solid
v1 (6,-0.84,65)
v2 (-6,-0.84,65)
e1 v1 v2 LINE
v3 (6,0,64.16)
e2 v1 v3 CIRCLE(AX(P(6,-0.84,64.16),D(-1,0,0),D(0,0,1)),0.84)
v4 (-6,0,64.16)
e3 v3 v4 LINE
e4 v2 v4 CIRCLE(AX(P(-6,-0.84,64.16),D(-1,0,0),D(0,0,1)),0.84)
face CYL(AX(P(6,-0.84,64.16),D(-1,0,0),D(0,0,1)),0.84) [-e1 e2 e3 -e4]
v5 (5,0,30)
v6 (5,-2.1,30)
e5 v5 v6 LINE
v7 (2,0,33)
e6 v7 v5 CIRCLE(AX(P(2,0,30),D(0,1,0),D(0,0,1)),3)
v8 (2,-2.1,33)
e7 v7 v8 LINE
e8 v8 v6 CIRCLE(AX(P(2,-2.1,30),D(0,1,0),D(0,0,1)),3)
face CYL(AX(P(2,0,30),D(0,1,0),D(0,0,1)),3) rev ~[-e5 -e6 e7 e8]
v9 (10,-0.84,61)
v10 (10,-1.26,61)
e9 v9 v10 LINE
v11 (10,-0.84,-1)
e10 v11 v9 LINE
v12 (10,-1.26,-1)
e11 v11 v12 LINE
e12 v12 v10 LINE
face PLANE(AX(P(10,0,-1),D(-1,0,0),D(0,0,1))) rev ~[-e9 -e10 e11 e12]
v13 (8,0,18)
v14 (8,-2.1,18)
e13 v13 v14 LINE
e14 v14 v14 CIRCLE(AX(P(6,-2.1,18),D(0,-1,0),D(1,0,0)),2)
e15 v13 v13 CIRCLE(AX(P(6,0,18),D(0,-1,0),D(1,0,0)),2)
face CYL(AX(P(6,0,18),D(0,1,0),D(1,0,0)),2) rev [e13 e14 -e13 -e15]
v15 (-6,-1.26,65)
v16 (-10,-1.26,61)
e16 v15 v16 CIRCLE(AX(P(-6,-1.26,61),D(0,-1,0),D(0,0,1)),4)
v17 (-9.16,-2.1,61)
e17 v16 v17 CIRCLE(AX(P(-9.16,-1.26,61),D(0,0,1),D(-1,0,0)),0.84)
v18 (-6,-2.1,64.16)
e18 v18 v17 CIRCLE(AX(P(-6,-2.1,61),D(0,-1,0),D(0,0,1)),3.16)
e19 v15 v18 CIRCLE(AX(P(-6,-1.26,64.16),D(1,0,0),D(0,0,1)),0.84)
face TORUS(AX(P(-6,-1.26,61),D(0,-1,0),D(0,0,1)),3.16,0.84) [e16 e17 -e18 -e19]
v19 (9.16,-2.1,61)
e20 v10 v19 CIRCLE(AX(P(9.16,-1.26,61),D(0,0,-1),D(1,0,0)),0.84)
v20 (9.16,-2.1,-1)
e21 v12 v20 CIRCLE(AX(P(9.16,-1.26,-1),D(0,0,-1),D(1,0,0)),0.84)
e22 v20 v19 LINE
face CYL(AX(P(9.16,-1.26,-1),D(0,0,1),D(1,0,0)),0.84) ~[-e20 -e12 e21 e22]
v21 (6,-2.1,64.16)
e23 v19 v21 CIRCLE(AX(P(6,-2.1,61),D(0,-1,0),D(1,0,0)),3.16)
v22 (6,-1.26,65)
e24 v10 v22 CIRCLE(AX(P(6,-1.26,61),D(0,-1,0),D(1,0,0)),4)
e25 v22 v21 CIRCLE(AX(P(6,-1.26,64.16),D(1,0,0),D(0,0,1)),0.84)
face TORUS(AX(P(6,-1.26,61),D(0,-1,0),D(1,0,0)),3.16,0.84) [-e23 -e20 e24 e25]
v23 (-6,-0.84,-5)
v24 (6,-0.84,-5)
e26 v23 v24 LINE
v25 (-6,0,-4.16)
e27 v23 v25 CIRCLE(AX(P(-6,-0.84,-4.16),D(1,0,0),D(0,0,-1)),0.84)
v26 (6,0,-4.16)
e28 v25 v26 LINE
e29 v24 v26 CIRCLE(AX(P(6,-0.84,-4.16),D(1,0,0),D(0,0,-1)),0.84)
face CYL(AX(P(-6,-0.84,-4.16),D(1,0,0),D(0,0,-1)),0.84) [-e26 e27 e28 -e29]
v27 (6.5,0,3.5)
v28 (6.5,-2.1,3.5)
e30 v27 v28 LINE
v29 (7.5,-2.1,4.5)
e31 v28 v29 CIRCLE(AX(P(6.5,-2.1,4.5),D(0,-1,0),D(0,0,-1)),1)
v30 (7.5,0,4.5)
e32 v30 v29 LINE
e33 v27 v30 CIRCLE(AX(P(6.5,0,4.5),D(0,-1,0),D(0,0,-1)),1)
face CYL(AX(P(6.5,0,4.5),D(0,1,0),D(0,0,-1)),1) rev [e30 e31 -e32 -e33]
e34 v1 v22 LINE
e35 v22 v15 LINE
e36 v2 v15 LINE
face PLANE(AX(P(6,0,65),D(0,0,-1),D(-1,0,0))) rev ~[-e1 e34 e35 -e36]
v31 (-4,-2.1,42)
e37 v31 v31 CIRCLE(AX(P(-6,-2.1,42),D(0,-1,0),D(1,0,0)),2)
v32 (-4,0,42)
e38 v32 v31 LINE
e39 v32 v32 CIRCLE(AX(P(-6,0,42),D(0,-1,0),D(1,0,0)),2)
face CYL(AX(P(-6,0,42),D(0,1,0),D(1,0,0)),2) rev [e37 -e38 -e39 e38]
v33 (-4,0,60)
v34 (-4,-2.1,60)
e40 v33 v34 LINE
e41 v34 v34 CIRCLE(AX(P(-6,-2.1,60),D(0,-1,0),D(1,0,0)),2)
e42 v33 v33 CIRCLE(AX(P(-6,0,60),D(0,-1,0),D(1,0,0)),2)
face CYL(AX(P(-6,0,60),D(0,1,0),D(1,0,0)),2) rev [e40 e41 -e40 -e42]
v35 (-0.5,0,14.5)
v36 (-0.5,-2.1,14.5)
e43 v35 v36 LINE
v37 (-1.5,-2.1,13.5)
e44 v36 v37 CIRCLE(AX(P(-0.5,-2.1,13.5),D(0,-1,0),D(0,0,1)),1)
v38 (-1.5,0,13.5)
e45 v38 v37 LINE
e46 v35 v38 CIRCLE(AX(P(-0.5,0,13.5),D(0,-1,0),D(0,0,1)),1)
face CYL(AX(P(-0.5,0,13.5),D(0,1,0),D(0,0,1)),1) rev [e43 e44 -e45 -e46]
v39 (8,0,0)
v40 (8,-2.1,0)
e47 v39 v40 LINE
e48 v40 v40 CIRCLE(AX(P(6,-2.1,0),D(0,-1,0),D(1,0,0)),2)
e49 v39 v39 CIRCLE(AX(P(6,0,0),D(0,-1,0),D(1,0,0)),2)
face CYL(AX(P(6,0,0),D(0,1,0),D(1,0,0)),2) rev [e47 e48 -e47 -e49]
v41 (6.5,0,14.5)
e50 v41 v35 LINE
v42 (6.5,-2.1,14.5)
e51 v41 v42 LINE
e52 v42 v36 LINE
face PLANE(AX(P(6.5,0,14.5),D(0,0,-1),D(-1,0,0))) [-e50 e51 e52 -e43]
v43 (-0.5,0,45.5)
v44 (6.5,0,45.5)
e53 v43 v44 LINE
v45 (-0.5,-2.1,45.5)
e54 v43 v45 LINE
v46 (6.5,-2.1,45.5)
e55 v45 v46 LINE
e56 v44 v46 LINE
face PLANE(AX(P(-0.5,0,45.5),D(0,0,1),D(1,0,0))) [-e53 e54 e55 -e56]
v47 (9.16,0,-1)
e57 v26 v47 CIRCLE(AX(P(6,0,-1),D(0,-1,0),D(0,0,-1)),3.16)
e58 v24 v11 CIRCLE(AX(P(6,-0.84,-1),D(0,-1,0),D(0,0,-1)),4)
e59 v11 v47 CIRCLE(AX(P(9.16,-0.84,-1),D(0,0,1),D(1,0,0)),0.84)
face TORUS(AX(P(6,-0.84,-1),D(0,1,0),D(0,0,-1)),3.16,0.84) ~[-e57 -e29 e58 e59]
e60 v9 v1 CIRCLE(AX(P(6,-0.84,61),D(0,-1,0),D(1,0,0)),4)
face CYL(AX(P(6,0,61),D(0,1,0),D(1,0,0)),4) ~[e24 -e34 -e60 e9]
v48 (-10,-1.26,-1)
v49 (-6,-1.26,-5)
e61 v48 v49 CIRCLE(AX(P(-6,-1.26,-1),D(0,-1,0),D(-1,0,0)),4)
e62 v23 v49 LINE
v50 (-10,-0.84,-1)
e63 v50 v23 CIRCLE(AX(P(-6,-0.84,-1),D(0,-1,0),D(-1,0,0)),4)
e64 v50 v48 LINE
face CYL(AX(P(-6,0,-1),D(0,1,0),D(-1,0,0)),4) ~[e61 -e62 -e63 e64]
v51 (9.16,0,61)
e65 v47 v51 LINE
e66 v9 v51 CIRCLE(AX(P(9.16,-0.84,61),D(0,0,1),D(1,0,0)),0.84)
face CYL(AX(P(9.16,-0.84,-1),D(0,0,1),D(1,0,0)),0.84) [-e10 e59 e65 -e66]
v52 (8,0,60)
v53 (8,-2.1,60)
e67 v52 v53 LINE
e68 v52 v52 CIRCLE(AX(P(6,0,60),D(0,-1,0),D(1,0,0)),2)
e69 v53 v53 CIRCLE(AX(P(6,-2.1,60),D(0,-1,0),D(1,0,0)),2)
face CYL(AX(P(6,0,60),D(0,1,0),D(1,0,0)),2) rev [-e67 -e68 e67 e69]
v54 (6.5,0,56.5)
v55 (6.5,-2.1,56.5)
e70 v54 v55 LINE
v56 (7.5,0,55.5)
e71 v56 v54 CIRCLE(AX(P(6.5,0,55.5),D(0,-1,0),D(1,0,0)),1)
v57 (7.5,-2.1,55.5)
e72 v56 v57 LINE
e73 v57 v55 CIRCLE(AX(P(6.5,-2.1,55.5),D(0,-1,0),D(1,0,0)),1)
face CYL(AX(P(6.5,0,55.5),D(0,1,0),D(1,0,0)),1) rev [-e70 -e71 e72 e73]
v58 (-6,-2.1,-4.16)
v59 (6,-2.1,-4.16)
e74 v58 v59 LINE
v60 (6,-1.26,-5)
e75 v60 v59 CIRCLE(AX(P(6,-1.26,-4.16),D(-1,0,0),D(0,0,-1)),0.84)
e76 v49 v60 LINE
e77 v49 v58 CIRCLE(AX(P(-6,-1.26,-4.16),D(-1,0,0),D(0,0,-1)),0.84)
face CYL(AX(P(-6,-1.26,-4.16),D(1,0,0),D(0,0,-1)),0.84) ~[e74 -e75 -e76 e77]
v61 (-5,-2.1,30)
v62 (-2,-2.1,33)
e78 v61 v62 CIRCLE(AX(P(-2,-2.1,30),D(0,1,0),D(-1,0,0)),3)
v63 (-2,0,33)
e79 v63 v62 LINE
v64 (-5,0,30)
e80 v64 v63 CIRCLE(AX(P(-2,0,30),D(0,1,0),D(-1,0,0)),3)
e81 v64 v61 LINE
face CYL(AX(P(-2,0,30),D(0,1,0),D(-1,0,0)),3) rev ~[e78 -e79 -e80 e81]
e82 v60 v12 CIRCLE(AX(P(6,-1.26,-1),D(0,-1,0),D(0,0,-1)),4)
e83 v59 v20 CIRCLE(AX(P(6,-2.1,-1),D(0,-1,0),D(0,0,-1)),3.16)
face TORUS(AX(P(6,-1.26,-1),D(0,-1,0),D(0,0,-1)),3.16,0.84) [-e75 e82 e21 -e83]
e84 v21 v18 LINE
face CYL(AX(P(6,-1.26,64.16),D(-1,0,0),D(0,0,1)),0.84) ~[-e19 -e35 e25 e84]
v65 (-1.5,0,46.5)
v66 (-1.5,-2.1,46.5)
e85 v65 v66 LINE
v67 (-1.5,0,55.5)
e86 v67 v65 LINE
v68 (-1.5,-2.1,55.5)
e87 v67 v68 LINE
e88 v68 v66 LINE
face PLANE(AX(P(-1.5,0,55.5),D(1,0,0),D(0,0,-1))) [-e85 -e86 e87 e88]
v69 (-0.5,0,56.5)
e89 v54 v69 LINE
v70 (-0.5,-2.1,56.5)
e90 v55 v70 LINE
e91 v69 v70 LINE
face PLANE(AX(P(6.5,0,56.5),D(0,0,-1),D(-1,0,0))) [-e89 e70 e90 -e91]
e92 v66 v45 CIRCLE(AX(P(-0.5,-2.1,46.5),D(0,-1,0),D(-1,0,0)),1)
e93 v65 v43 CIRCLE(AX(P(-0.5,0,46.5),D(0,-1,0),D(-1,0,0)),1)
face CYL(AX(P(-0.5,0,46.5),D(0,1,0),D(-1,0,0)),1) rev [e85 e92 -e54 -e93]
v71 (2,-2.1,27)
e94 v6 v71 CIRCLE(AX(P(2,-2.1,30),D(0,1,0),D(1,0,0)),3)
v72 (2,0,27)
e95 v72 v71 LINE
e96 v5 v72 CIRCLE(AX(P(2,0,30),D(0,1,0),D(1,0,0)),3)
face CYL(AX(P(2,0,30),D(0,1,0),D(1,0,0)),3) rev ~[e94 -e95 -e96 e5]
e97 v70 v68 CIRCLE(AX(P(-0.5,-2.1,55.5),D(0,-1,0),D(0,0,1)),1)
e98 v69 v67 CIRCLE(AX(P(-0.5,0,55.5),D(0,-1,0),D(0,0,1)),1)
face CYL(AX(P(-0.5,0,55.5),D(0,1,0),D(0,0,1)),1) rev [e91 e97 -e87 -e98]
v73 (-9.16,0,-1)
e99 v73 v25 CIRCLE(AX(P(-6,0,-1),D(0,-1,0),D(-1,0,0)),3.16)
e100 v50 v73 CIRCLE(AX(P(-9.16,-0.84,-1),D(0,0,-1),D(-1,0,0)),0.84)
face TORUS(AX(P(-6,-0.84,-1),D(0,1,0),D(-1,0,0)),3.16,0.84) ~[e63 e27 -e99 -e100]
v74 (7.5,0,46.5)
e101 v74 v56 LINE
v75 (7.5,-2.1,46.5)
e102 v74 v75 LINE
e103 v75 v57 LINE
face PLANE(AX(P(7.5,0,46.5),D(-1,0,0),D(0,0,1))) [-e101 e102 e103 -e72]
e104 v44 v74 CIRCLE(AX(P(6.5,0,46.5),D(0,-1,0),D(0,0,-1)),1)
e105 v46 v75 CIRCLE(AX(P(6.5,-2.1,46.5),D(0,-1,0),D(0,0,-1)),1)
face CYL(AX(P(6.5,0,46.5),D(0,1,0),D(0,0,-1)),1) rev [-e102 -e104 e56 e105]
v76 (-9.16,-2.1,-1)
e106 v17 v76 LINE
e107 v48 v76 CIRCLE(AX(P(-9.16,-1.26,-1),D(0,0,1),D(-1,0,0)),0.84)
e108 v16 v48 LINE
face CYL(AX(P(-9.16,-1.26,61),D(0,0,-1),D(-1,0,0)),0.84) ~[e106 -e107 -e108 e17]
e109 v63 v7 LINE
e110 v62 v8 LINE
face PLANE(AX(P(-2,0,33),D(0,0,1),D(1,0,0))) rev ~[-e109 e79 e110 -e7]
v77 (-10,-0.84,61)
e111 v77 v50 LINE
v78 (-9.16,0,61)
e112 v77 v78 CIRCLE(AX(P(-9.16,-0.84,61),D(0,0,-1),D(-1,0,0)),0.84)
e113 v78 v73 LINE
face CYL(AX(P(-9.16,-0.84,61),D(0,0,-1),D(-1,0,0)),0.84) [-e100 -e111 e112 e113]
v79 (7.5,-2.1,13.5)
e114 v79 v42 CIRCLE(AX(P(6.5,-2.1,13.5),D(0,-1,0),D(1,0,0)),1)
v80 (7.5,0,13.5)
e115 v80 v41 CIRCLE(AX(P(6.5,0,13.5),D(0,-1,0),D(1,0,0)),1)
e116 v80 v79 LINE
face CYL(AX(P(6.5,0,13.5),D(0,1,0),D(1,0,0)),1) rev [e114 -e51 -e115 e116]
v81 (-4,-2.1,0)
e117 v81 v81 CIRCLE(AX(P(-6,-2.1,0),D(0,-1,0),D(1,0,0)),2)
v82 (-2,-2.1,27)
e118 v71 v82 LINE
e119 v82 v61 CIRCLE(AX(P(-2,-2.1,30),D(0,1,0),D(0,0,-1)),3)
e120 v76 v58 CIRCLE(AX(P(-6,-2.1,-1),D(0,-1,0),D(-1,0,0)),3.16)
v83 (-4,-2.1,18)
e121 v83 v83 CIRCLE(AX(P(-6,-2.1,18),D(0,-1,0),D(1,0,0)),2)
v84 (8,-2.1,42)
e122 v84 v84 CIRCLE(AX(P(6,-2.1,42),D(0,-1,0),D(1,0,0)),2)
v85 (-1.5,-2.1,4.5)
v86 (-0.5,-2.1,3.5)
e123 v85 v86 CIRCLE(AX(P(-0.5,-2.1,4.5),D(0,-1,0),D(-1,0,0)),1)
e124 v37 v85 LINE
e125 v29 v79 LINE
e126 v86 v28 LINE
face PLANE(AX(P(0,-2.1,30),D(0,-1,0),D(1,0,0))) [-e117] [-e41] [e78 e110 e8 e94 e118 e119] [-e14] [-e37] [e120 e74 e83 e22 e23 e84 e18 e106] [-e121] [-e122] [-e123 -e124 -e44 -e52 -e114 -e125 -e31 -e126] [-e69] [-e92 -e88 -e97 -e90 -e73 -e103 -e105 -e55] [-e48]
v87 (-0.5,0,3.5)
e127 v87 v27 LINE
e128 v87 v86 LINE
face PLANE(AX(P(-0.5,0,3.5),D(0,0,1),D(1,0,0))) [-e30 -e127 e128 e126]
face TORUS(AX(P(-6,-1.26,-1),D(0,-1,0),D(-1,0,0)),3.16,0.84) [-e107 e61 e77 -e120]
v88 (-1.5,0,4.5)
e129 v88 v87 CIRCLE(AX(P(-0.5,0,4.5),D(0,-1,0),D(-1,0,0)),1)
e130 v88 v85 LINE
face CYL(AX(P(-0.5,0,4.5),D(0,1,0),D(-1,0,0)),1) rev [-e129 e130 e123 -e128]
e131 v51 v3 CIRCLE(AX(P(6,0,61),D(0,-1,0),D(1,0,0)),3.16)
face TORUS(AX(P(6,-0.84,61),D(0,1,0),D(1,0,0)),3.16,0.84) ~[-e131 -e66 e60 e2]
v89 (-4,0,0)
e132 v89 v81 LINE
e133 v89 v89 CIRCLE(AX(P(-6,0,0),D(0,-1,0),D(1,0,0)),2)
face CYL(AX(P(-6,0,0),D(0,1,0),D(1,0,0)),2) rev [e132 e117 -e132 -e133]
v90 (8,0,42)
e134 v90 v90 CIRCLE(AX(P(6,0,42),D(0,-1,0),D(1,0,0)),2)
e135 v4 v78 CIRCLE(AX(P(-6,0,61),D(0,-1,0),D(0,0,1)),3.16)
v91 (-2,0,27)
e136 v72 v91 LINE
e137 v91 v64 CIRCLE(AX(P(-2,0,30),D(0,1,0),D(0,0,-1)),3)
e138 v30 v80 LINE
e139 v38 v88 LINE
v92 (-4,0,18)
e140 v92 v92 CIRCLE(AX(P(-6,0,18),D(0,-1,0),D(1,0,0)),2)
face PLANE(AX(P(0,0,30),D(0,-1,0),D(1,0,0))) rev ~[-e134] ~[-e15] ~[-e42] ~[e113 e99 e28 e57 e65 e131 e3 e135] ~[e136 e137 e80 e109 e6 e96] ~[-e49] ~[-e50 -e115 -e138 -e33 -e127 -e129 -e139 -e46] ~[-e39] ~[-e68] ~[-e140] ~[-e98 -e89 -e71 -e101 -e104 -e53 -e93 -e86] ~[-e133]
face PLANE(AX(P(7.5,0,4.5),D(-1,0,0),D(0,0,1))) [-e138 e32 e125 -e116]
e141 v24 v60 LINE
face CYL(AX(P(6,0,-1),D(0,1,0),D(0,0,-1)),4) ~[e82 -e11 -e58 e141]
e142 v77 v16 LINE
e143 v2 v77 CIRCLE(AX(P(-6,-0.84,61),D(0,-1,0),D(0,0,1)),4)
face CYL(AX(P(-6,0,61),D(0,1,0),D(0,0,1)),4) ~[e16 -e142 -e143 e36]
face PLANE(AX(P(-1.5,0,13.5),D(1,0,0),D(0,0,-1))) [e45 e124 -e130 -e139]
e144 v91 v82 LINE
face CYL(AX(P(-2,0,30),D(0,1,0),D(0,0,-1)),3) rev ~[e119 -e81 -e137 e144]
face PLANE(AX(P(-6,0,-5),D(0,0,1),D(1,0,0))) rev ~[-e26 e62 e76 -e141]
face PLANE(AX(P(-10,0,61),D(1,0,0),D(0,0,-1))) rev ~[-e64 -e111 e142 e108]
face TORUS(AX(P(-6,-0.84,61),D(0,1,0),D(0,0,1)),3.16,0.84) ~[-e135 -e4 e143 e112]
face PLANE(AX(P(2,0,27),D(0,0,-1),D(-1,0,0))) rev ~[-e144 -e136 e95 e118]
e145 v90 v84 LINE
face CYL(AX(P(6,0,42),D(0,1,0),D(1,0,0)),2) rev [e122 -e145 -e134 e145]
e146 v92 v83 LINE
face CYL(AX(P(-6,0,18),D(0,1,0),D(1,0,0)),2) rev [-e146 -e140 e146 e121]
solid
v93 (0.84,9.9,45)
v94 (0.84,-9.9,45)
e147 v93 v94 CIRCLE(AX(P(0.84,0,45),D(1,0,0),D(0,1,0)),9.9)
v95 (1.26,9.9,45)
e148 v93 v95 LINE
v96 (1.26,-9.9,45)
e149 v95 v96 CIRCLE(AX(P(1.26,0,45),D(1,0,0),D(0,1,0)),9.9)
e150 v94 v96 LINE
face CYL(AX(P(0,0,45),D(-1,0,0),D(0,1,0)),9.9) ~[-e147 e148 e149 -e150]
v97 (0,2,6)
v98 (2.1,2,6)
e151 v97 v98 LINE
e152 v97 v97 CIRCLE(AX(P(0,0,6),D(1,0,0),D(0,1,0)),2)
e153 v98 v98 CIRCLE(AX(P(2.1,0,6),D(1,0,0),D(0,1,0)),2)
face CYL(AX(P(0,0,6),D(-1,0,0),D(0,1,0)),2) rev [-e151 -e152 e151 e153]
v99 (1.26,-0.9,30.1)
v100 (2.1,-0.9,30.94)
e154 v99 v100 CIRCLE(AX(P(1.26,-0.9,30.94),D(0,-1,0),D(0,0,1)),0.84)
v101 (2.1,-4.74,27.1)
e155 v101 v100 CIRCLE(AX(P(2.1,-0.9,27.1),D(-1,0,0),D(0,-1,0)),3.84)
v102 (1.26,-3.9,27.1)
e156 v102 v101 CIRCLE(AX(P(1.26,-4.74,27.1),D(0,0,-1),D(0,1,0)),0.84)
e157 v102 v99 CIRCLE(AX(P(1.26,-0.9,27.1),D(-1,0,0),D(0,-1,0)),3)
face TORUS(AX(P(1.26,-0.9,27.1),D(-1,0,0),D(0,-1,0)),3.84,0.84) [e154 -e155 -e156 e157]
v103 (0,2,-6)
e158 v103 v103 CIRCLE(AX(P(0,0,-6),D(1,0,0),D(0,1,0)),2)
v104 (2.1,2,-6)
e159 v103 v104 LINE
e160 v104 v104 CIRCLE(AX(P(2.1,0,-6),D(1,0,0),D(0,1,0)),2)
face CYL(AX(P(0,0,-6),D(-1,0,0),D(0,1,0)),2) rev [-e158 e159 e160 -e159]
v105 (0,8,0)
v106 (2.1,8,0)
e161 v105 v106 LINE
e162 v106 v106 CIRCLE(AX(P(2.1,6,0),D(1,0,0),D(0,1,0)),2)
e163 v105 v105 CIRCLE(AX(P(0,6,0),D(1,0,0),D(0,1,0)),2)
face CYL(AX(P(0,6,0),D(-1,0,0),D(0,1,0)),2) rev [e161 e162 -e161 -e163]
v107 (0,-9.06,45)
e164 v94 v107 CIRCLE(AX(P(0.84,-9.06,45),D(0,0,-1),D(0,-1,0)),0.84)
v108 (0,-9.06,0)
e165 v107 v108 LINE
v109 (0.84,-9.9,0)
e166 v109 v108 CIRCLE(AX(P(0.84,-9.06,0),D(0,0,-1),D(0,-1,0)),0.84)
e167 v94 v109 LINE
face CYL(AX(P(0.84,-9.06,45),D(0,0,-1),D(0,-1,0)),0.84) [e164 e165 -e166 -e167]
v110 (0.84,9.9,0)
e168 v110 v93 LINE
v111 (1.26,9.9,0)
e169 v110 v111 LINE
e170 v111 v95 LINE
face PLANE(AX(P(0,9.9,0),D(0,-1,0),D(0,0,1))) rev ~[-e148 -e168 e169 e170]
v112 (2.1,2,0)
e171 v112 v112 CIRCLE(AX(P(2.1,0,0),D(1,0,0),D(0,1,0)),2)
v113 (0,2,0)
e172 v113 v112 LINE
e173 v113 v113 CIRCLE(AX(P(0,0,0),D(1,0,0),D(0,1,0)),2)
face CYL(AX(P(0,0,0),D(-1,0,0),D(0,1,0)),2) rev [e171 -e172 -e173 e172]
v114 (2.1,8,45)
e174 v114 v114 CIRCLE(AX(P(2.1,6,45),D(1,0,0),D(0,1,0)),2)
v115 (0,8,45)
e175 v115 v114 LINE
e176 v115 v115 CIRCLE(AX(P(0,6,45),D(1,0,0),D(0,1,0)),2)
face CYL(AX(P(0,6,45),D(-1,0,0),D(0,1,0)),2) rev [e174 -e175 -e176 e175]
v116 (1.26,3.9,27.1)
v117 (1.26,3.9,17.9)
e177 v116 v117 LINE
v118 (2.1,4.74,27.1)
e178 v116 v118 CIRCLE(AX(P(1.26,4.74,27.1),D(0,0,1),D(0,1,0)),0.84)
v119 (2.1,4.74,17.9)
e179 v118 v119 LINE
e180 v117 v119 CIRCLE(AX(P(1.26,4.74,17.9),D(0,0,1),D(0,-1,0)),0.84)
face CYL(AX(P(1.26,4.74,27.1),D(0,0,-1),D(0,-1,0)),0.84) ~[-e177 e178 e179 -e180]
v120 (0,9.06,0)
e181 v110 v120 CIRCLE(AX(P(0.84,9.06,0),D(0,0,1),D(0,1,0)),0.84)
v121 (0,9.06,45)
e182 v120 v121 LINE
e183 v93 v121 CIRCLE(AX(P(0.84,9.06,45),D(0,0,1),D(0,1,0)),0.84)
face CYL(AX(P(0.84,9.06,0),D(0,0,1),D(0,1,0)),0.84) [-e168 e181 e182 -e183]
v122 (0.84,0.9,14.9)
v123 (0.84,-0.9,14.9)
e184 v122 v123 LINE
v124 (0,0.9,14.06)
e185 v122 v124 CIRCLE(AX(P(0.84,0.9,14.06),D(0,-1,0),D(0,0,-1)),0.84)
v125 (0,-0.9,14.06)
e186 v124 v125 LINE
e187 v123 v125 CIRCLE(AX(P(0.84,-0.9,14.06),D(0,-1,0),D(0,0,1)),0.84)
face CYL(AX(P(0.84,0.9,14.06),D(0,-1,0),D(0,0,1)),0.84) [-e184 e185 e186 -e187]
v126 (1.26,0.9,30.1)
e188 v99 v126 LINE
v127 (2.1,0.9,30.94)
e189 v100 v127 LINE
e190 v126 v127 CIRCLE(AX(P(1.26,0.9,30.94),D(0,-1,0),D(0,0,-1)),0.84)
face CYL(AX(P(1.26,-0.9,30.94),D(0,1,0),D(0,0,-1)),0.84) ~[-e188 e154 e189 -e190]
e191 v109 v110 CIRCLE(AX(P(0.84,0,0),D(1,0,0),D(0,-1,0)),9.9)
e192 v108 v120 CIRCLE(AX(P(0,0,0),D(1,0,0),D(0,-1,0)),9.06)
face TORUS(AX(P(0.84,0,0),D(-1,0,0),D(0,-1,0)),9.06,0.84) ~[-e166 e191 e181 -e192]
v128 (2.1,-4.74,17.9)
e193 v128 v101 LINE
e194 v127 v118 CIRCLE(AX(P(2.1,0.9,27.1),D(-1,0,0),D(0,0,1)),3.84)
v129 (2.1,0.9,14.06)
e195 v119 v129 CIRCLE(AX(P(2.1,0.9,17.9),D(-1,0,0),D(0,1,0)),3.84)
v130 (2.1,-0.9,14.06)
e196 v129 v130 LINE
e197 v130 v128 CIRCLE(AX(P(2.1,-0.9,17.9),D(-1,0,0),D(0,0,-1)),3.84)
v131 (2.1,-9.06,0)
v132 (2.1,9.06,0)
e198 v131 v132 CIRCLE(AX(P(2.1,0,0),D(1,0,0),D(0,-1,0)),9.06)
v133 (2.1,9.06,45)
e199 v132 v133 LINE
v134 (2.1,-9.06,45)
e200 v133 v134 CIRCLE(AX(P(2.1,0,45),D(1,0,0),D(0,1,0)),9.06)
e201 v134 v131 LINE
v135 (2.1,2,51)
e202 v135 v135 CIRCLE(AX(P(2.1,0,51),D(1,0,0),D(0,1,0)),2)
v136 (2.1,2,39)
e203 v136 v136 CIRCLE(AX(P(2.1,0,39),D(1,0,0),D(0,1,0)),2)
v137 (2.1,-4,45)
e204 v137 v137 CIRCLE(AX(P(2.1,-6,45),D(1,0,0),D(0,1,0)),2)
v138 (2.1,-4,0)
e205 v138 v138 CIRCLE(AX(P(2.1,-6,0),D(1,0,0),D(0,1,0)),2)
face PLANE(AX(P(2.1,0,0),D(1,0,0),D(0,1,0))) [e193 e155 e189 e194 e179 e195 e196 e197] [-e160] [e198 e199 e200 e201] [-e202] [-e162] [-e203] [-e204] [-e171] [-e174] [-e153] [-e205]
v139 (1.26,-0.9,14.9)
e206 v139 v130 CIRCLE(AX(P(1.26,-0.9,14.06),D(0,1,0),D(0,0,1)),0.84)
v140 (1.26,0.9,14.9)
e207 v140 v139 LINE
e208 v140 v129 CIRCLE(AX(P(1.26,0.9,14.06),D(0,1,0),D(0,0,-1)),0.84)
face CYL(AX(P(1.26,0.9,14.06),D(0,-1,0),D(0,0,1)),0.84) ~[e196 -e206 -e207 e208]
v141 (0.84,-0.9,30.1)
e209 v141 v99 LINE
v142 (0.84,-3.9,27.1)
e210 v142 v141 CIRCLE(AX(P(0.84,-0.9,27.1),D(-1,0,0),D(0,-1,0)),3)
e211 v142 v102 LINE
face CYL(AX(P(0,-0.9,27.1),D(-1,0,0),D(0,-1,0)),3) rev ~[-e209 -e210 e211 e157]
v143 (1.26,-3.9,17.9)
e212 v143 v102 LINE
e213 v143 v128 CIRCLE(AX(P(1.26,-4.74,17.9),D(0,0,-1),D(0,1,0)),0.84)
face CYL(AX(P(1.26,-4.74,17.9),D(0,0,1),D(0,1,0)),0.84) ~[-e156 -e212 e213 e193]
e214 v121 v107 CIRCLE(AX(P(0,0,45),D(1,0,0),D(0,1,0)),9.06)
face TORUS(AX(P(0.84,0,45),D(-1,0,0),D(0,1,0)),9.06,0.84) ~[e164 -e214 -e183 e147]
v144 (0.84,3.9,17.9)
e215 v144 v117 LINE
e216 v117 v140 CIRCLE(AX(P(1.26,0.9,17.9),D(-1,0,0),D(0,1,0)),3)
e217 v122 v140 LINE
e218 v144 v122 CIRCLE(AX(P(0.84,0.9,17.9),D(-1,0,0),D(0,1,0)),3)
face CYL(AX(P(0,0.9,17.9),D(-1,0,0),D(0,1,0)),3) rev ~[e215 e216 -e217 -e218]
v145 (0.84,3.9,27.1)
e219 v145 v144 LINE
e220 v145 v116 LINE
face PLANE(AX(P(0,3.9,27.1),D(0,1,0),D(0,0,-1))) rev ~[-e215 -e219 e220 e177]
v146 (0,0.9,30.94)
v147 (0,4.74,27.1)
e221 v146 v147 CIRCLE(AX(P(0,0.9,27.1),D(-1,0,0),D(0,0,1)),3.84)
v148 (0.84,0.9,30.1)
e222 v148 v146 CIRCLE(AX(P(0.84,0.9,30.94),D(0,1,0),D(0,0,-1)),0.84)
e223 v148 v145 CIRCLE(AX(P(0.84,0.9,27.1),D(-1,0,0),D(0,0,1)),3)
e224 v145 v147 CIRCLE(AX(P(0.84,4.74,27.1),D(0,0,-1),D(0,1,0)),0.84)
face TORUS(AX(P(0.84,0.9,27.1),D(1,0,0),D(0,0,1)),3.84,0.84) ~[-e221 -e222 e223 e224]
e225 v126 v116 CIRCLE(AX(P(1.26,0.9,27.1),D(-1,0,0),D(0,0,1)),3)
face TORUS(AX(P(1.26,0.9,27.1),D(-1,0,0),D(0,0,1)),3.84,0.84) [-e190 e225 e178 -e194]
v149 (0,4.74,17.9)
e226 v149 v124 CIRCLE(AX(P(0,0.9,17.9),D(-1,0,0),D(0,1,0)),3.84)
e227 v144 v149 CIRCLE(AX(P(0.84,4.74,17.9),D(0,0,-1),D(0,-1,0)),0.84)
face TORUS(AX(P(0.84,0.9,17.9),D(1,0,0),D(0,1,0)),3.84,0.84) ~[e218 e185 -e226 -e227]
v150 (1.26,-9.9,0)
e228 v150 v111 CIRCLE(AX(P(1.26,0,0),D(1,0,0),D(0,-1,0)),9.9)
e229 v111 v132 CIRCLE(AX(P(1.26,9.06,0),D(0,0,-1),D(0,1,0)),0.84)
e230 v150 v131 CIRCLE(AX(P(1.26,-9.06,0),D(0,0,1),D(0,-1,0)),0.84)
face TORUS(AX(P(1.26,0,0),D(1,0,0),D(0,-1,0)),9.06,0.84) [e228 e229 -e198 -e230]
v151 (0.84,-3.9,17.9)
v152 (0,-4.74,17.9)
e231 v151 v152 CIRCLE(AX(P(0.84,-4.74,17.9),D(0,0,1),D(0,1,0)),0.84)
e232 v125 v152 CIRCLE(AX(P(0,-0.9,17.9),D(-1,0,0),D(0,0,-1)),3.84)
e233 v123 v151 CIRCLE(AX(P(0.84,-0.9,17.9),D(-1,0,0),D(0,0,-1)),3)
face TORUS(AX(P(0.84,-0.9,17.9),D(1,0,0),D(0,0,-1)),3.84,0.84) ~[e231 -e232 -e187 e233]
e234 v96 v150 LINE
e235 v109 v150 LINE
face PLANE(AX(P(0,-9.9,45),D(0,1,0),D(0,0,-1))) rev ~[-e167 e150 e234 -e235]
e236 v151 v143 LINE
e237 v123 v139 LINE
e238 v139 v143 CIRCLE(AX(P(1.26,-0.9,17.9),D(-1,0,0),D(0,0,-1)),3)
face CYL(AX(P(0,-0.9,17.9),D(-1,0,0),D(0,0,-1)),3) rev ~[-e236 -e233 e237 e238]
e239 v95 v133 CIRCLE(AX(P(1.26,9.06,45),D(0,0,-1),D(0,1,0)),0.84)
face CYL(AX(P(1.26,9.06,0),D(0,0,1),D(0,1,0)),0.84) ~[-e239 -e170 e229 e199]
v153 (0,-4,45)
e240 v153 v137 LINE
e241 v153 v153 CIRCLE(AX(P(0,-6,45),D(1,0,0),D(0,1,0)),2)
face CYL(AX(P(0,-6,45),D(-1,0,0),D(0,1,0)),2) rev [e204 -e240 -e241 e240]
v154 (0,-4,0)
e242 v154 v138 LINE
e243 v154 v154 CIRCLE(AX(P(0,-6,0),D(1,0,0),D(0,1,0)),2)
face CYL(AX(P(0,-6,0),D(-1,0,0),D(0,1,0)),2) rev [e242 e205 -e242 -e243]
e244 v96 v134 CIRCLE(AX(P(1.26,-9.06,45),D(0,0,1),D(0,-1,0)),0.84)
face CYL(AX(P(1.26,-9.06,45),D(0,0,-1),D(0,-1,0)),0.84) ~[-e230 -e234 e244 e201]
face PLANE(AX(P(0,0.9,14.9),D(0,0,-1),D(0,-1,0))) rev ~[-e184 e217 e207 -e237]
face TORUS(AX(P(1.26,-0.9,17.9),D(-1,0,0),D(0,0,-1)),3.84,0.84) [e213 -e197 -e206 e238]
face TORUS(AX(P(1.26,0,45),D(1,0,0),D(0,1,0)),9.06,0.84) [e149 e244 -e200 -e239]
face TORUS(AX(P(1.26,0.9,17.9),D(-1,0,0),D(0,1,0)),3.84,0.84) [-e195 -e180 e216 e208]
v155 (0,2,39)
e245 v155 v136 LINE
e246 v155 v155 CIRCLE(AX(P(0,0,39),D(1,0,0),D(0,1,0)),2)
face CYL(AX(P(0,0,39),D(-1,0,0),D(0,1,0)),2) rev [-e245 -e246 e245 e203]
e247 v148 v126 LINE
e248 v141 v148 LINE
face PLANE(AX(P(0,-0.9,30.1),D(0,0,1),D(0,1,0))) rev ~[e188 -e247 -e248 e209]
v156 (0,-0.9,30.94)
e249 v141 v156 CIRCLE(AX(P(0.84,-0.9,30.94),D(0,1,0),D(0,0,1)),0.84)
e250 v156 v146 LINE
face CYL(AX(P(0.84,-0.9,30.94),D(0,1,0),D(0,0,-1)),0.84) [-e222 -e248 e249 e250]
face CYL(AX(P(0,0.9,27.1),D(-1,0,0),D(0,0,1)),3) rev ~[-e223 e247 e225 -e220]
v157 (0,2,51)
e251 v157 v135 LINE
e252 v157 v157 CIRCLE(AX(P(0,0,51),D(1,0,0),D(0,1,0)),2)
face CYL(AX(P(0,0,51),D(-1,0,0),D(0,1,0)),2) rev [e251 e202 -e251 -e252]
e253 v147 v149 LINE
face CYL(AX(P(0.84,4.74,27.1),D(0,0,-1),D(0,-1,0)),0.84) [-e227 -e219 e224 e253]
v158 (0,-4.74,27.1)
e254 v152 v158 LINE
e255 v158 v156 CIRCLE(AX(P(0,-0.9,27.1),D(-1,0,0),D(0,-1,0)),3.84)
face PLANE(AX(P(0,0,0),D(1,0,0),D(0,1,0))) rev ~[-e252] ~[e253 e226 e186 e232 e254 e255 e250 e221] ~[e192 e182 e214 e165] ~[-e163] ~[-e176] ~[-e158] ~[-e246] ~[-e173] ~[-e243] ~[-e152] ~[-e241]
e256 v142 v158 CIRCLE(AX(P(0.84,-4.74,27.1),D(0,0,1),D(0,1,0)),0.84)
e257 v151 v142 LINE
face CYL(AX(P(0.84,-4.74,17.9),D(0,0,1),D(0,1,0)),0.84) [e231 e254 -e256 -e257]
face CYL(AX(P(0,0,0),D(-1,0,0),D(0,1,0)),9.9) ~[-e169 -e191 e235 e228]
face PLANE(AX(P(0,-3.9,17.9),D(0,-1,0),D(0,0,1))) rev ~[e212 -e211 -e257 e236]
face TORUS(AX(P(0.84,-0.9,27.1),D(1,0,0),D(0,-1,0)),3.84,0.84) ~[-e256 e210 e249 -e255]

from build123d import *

# Parameters (mm, degrees)
F4_R      = 2
F5_DEPTH  = 2.1
F7_DEPTH  = 2.1
F8_R      = 0.84
F9_R      = 2
F10_DEPTH = 2.1
F11_R     = 0.84


# Not quite as in the source:
# - a feature names something its author has since deleted; it is built from what else it names


with BuildPart() as f5:
    # F4 (on Front) → F5 (new body)
    with BuildSketch(Plane.XZ):
        with BuildLine():
            ThreePointArc((10, 61), (8.8284271247, 63.8284271247), (6, 65))
            Line((6, 65), (-6, 65))
            ThreePointArc((-6, 65), (-8.8284271247, 63.8284271247), (-10, 61))
            Line((-10, 61), (-10, -1))
            ThreePointArc((-10, -1), (-8.8284271247, -3.8284271247), (-6, -5))
            Line((-6, -5), (6, -5))
            ThreePointArc((6, -5), (8.8284271247, -3.8284271247), (10, -1))
            Line((10, -1), (10, 61))
        make_face()
        with Locations((-6, 0)):
            Circle(F4_R, mode=Mode.SUBTRACT)
        with Locations((-6, 18)):
            Circle(F4_R, mode=Mode.SUBTRACT)
        with Locations((6, 0)):
            Circle(F4_R, mode=Mode.SUBTRACT)
        with Locations((6, 18)):
            Circle(F4_R, mode=Mode.SUBTRACT)
        with Locations((-6, 42)):
            Circle(F4_R, mode=Mode.SUBTRACT)
        with Locations((-6, 60)):
            Circle(F4_R, mode=Mode.SUBTRACT)
        with BuildLine():
            ThreePointArc((5, 30), (4.1213203436, 27.8786796564), (2, 27))
            Line((2, 27), (-2, 27))
            ThreePointArc((-2, 27), (-4.1213203436, 27.8786796564), (-5, 30))
            ThreePointArc((-5, 30), (-4.1213203436, 32.1213203436), (-2, 33))
            Line((-2, 33), (2, 33))
            ThreePointArc((2, 33), (4.1213203436, 32.1213203436), (5, 30))
        make_face(mode=Mode.SUBTRACT)
        with Locations((6, 42)):
            Circle(F4_R, mode=Mode.SUBTRACT)
        with Locations((6, 60)):
            Circle(F4_R, mode=Mode.SUBTRACT)
    extrude(amount=F5_DEPTH)

    # F6 (on Front) → F7 (cut, through all)
    with BuildSketch(Plane.XZ):
        with BuildLine():
            Line((6.5, 14.5), (-0.5, 14.5))
            ThreePointArc((-0.5, 14.5), (-1.2071067812, 14.2071067812), (-1.5, 13.5))
            Line((-1.5, 13.5), (-1.5, 4.5))
            ThreePointArc((-1.5, 4.5), (-1.2071067812, 3.7928932188), (-0.5, 3.5))
            Line((-0.5, 3.5), (6.5, 3.5))
            ThreePointArc((6.5, 3.5), (7.2071067812, 3.7928932188), (7.5, 4.5))
            Line((7.5, 4.5), (7.5, 13.5))
            ThreePointArc((7.5, 13.5), (7.2071067812, 14.2071067812), (6.5, 14.5))
        make_face()
        with BuildLine():
            ThreePointArc((-1.5, 46.5), (-1.2071067812, 45.7928932188), (-0.5, 45.5))
            Line((-0.5, 45.5), (6.5, 45.5))
            ThreePointArc((6.5, 45.5), (7.2071067812, 45.7928932188), (7.5, 46.5))
            Line((7.5, 46.5), (7.5, 55.5))
            ThreePointArc((7.5, 55.5), (7.2071067812, 56.2071067812), (6.5, 56.5))
            Line((6.5, 56.5), (-0.5, 56.5))
            ThreePointArc((-0.5, 56.5), (-1.2071067812, 56.2071067812), (-1.5, 55.5))
            Line((-1.5, 55.5), (-1.5, 46.5))
        make_face()
    extrude(amount=F7_DEPTH, mode=Mode.SUBTRACT)

    # F8
    f8_edges = [f5.edges().sort_by_distance(p)[0] for p in [
        (10, -1.05, -1),
        (10, -1.05, 61),
        (10, 0, 30),
        (10, -2.1, 30),
    ]]
    fillet(f8_edges, radius=F8_R)


with BuildPart() as f10:
    # F9 (on Right) → F10 (new body)
    with BuildSketch(Plane.YZ):
        with BuildLine():
            ThreePointArc((-9.9, 0), (0, -9.9), (9.9, 0))
            ThreePointArc((9.9, 0), (0, 9.9), (-9.9, 0))
        make_face()
        with Locations((-6, 0)):
            Circle(F9_R, mode=Mode.SUBTRACT)
        with Locations((0, -6)):
            Circle(F9_R, mode=Mode.SUBTRACT)
        Circle(F9_R, mode=Mode.SUBTRACT)
        with Locations((0, 6)):
            Circle(F9_R, mode=Mode.SUBTRACT)
        with Locations((6, 0)):
            Circle(F9_R, mode=Mode.SUBTRACT)
        with BuildLine():
            ThreePointArc((-9.9, 0), (0, 9.9), (9.9, 0))
            Line((9.9, 0), (9.9, 45))
            ThreePointArc((9.9, 45), (0, 35.1), (-9.9, 45))
            Line((-9.9, 45), (-9.9, 0))
        make_face()
        with BuildLine():
            ThreePointArc((3.9, 17.9), (3.0213203436, 15.7786796564), (0.9, 14.9))
            Line((0.9, 14.9), (-0.9, 14.9))
            ThreePointArc((-0.9, 14.9), (-3.0213203436, 15.7786796564), (-3.9, 17.9))
            Line((-3.9, 17.9), (-3.9, 27.1))
            ThreePointArc((-3.9, 27.1), (-3.0213203436, 29.2213203436), (-0.9, 30.1))
            Line((-0.9, 30.1), (0.9, 30.1))
            ThreePointArc((0.9, 30.1), (3.0213203436, 29.2213203436), (3.9, 27.1))
            Line((3.9, 27.1), (3.9, 17.9))
        make_face(mode=Mode.SUBTRACT)
        with BuildLine():
            ThreePointArc((-9.9, 45), (0, 35.1), (9.9, 45))
            ThreePointArc((9.9, 45), (0, 54.9), (-9.9, 45))
        make_face()
        with Locations((-6, 45)):
            Circle(F9_R, mode=Mode.SUBTRACT)
        with Locations((0, 39)):
            Circle(F9_R, mode=Mode.SUBTRACT)
        with Locations((0, 51)):
            Circle(F9_R, mode=Mode.SUBTRACT)
        with Locations((6, 45)):
            Circle(F9_R, mode=Mode.SUBTRACT)
    extrude(amount=F10_DEPTH)

    # F11
    f11_edges = [f10.edges().sort_by_distance(p)[0] for p in [
        (1.05, 9.9, 0),
        (1.05, 9.9, 45),
        (0, 9.9, 22.5),
        (2.1, 9.9, 22.5),
        (1.05, -3.9, 17.9),
        (1.05, -3.9, 27.1),
        (0, -3.9, 22.5),
        (2.1, -3.9, 22.5),
    ]]
    fillet(f11_edges, radius=F11_R)


solid = Compound([f5.part, f10.part])
